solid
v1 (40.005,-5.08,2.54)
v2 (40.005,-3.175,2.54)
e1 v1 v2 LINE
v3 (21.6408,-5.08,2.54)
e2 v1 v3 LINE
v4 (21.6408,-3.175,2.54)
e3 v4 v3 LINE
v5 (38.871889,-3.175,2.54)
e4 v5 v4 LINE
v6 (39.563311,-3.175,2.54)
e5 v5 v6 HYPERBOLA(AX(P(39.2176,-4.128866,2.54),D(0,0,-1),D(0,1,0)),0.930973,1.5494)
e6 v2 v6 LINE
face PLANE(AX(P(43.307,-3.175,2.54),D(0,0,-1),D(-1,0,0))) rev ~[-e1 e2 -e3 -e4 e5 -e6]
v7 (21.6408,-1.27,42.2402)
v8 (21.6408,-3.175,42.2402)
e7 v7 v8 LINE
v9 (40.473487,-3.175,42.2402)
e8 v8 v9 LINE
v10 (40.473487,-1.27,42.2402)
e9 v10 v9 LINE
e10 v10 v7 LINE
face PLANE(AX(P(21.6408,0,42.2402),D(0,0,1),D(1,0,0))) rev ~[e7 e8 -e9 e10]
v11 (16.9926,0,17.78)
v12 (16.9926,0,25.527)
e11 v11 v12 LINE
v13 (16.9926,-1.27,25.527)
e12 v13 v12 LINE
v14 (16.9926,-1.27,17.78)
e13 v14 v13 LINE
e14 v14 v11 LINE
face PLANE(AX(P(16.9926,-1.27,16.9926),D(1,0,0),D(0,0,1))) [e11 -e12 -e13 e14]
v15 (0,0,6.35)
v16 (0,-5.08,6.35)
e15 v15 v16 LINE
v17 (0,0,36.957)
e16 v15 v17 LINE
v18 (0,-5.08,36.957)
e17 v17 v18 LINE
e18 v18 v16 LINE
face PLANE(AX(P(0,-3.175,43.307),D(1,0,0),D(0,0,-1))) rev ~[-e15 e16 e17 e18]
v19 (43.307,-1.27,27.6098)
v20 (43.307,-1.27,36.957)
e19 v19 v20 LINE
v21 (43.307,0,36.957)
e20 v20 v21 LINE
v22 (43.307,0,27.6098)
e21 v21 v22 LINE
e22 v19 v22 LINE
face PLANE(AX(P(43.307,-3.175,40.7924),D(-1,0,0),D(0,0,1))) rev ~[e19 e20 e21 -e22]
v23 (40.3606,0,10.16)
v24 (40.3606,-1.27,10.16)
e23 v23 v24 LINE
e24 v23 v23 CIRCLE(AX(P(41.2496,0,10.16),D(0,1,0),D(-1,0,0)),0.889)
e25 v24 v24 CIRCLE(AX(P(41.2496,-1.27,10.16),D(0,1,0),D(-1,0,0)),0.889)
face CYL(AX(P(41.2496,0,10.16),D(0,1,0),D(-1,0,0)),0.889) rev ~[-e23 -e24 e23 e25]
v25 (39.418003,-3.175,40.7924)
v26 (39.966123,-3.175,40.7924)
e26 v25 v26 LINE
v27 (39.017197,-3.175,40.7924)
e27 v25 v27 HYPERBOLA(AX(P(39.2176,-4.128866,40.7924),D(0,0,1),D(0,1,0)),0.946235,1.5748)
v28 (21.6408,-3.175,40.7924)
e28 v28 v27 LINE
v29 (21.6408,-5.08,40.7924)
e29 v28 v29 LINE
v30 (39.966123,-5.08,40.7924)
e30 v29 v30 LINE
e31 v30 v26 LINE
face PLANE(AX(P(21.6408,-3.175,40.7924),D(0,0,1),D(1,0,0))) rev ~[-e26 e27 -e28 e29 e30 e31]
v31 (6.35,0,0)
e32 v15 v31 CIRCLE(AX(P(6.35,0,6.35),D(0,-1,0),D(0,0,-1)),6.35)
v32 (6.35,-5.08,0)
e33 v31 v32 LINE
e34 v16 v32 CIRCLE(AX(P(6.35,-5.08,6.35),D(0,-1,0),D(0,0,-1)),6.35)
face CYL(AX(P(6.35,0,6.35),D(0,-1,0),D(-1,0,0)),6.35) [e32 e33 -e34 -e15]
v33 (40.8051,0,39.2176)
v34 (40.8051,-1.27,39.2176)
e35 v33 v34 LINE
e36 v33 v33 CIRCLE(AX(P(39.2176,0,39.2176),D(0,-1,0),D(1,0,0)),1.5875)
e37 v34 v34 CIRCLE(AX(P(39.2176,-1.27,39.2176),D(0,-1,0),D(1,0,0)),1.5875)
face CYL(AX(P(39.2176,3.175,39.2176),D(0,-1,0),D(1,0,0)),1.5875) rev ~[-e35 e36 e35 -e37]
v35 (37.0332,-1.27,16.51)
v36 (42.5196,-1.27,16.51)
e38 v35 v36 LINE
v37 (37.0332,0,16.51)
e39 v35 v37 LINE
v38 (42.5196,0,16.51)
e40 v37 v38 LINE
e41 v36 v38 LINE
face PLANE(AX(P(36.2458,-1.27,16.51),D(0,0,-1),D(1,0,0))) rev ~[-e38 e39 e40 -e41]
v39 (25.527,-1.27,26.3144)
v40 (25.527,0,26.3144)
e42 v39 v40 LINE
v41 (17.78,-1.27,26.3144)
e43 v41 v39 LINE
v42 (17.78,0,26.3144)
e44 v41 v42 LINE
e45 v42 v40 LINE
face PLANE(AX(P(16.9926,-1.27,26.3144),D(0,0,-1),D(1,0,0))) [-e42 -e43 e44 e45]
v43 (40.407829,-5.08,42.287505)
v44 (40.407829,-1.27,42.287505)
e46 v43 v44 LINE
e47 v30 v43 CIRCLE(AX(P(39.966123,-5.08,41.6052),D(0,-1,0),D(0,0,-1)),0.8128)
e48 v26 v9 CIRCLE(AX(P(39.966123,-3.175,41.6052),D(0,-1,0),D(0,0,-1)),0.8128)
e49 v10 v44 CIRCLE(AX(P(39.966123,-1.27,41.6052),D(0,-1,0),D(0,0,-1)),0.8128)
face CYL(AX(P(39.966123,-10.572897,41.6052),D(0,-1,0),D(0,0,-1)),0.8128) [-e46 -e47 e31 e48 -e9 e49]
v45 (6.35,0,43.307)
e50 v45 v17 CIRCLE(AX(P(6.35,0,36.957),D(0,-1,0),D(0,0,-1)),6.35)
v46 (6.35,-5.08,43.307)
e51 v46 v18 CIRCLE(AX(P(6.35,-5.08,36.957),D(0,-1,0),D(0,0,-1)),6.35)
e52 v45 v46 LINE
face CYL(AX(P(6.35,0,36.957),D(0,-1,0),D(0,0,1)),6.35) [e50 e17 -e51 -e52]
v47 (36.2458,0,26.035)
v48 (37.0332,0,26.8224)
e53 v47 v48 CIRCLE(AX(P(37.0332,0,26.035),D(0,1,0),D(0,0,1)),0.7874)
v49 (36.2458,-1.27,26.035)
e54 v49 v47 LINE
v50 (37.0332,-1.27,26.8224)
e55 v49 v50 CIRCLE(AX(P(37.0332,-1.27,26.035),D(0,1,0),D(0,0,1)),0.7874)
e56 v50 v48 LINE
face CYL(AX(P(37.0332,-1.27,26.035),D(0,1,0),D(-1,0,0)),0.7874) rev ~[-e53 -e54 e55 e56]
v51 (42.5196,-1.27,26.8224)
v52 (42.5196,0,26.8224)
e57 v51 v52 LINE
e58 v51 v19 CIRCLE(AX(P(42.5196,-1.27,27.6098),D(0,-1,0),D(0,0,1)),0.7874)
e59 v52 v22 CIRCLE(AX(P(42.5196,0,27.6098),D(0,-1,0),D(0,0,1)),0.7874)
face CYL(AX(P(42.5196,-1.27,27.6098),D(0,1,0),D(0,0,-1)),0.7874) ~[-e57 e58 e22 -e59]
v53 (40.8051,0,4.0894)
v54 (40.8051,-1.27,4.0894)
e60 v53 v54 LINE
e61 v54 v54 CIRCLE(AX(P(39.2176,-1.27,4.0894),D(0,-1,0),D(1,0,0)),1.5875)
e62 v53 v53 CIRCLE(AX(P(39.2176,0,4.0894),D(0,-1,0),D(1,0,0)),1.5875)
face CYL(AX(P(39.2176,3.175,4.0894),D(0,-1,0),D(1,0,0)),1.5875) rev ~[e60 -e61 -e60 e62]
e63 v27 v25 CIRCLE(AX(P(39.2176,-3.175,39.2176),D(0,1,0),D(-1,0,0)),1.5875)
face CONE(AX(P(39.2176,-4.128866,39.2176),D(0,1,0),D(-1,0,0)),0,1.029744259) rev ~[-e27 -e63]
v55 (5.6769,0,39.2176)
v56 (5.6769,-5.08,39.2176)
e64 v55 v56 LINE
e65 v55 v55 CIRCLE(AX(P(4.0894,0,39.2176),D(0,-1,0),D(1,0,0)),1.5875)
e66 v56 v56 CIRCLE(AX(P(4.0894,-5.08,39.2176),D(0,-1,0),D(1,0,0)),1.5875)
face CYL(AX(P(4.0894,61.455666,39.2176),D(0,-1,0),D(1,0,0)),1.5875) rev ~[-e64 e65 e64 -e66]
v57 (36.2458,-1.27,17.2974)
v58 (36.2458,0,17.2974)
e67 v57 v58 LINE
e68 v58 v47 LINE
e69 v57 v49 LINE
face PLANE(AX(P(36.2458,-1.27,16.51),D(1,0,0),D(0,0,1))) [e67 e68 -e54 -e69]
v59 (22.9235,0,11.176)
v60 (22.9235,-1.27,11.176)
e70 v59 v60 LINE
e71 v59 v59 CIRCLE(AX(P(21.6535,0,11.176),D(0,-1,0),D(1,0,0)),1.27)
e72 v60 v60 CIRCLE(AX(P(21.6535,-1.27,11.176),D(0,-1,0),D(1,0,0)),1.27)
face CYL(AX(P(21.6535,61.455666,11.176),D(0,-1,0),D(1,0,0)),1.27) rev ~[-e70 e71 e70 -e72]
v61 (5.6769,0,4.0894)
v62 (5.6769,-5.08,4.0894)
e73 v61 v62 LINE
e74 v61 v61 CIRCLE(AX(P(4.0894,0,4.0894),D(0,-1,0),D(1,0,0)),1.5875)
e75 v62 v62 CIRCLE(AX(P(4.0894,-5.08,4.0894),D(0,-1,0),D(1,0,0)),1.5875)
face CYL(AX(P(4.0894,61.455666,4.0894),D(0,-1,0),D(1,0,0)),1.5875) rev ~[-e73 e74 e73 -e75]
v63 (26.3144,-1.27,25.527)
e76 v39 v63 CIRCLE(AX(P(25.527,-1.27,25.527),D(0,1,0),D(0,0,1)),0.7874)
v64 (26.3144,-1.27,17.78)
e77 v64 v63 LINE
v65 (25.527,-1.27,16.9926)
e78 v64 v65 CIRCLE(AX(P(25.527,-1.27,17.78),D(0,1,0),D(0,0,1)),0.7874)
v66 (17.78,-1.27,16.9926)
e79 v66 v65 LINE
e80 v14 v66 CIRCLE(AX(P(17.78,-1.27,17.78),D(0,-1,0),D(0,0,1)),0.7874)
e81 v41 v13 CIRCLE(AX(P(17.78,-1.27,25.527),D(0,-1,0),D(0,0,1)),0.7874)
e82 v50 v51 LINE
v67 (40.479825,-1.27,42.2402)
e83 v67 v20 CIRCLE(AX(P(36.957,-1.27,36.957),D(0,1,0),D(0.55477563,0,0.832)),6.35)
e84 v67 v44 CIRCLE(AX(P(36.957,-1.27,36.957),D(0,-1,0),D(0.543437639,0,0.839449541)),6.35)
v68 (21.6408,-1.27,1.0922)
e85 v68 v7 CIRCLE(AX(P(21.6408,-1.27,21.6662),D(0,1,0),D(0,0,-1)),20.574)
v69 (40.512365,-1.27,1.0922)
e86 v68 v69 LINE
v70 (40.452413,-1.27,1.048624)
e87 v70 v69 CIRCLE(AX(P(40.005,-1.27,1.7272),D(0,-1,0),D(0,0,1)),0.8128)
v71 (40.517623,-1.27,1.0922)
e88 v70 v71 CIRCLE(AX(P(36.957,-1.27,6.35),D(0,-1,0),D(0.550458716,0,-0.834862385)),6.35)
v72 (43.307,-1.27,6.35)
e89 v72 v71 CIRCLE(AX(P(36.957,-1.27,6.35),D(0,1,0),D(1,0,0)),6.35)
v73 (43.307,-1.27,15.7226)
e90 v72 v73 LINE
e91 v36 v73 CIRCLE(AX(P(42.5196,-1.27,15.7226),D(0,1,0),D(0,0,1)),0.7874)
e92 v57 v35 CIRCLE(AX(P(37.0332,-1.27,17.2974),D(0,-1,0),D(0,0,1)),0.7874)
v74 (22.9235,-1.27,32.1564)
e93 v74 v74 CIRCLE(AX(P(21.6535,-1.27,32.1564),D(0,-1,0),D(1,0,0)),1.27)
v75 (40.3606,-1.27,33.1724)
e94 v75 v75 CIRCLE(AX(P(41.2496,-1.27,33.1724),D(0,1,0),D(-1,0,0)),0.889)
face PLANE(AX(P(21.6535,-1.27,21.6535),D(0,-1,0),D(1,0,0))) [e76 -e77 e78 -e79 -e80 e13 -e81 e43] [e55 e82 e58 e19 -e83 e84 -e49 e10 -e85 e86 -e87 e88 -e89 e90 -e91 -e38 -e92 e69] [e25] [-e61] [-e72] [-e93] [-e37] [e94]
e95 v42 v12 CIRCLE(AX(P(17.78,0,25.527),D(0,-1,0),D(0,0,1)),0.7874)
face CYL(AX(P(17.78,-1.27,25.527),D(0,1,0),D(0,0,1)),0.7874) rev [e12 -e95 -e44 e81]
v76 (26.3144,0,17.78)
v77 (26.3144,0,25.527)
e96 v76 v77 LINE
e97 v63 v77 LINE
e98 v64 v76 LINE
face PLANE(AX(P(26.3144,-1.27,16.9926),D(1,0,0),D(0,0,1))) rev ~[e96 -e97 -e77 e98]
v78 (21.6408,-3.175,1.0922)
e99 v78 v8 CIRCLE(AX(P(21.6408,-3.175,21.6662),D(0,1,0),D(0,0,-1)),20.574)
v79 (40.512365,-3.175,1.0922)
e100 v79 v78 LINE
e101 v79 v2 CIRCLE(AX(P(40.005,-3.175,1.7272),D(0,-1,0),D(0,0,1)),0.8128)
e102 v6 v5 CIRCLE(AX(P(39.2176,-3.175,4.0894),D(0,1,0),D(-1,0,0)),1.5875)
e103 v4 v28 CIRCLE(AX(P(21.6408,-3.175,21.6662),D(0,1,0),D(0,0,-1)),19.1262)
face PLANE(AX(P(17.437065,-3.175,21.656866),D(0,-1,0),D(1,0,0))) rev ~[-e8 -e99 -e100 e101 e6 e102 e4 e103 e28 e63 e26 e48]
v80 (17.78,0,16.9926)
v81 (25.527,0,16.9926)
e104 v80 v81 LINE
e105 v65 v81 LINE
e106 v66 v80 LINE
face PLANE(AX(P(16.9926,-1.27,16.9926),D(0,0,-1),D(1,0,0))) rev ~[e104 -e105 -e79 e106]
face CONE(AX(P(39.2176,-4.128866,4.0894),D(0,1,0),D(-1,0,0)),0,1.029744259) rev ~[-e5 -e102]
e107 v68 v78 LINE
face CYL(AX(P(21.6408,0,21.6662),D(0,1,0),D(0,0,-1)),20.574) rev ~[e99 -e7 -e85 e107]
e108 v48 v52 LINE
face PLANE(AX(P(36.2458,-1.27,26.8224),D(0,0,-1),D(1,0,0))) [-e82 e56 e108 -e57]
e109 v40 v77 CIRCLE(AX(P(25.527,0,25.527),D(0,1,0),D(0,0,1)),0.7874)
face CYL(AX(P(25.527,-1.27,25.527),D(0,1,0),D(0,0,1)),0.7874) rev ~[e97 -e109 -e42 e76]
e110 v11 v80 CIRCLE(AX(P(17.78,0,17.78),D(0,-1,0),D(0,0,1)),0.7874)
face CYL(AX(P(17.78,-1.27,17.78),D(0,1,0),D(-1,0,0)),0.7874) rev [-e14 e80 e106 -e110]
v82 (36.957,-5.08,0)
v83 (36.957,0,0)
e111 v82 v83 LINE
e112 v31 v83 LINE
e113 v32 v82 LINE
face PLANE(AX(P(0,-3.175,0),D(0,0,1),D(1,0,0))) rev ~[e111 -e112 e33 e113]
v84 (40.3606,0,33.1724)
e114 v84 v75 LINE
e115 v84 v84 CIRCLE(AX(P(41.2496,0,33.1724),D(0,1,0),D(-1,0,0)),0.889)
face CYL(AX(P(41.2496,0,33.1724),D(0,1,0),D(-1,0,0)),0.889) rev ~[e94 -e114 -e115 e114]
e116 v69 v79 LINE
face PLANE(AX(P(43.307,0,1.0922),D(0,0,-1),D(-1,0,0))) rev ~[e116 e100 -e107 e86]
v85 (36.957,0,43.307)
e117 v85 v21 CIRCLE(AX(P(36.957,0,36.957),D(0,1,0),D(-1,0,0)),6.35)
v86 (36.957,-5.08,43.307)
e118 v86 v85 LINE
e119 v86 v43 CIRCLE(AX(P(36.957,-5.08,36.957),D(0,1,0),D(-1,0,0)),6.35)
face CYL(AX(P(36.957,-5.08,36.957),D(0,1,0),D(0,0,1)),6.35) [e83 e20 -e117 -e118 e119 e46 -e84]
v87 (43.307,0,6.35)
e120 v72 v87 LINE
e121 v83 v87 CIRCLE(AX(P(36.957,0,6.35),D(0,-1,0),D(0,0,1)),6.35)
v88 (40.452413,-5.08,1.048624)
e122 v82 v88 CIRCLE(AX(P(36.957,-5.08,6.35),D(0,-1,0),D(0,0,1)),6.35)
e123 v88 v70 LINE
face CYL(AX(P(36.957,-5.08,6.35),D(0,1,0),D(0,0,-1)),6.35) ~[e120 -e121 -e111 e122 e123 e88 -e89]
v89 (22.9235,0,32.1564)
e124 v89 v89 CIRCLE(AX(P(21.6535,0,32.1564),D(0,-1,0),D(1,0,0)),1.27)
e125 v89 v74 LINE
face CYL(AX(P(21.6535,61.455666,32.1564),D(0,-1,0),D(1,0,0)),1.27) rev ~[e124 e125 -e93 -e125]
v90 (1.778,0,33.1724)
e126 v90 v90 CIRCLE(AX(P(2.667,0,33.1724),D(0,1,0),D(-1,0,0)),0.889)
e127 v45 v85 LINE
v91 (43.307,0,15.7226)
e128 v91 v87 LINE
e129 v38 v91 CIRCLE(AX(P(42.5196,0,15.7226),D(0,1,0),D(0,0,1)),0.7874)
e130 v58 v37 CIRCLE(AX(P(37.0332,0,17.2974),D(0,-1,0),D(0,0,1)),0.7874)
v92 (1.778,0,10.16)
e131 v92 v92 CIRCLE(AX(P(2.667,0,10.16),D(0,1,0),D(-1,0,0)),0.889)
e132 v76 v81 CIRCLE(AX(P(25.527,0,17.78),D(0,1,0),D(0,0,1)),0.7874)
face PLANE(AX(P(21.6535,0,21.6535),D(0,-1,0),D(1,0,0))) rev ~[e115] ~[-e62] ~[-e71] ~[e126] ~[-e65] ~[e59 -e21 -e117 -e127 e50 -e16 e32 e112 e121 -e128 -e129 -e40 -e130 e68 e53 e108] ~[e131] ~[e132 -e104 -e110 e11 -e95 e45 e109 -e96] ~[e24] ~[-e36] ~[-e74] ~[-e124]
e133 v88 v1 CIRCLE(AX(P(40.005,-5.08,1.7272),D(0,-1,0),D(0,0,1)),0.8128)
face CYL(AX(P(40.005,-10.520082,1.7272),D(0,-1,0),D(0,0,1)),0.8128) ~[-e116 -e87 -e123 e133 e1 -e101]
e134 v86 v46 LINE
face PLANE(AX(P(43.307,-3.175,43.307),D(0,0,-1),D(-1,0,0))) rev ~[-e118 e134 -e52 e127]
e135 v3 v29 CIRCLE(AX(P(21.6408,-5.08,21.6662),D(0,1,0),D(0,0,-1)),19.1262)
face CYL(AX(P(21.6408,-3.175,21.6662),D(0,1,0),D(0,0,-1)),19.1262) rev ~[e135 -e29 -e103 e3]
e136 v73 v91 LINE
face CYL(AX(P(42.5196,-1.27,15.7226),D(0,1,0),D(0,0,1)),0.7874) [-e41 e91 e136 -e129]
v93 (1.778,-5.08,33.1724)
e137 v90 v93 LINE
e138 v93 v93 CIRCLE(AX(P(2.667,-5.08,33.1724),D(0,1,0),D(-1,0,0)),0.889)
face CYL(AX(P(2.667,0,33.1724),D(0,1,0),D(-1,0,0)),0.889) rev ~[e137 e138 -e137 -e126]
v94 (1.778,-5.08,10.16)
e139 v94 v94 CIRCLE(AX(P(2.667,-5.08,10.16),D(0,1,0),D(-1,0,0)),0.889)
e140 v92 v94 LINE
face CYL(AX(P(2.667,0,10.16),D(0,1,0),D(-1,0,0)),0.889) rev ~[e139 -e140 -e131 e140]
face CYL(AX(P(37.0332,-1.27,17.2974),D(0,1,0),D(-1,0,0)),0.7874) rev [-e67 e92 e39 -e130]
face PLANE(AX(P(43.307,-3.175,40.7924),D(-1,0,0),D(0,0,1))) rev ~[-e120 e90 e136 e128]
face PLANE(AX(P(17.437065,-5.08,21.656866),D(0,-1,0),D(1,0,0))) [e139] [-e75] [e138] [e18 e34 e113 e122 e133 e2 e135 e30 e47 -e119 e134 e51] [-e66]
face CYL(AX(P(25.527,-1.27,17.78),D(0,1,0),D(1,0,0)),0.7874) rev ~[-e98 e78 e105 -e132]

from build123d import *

# Parameters (mm, degrees)
F0_W         = 43.307
F0_H         = 43.307
F1_DEPTH     = 1.27
F3_DEPTH     = 3.175
F5_DEPTH     = 1.905
F6_R         = 0.889
F7_DEPTH     = 5.081
F8_W         = 9.3218
F8_H         = 9.3218
F8_W_2       = 7.0612
F8_H_2       = 10.3124
F10_DEPTH    = 1.27
F11_D        = 3.175
F14_D        = 2.54
F15_R        = 6.35
F16_T4_DEPTH = 12.7851645967
F16_T9_DEPTH = 12.8907938144
F17_R        = 0.7874
F18_D        = 3.175
F18_DEPTH    = 3.175
F18_TIP      = 0.9538662327


# Not quite as in the source:
# - a fillet or chamfer that OpenCascade refuses, or shapes differently, is made with other operations: its cross-section is extruded or revolved along the edge and cut away or added


with BuildPart() as f1:
    # F0 (on Front) → F1 (new body)
    with BuildSketch(Plane.XZ):
        with Locations((21.6535, 21.6535)):
            Rectangle(F0_W, F0_H)
    extrude(amount=F1_DEPTH)

    # F2 (on Front) → F3 (join)
    with BuildSketch(Plane.XZ):
        with BuildLine():
            Line((43.307, 43.307), (0, 43.307))
            Line((0, 43.307), (0, 0))
            Line((0, 0), (43.307, 0))
            Line((43.307, 0), (43.307, 1.0922))
            Line((43.307, 1.0922), (21.6408, 1.0922))
            ThreePointArc((21.6408, 1.0922), (1.0668, 21.6662), (21.6408, 42.2402))
            Line((21.6408, 42.2402), (43.307, 42.2402))
            Line((43.307, 42.2402), (43.307, 43.307))
        make_face()
    extrude(amount=F3_DEPTH)

    # F4 (on face) → F5 (join)
    with BuildSketch(Plane.XZ.offset(3.175)):
        with BuildLine():
            Line((43.307, 43.307), (0, 43.307))
            Line((0, 43.307), (0, 0))
            Line((0, 0), (43.307, 0))
            Line((43.307, 0), (43.307, 2.54))
            Line((43.307, 2.54), (21.6408, 2.54))
            ThreePointArc((21.6408, 2.54), (2.5146, 21.6662), (21.6408, 40.7924))
            Line((21.6408, 40.7924), (43.307, 40.7924))
            Line((43.307, 40.7924), (43.307, 43.307))
        make_face()
    extrude(amount=F5_DEPTH)

    # F6 (on face) → F7 (cut, through all)
    with BuildSketch(Plane(origin=(0, 0, 0), x_dir=(-1, 0, 0), z_dir=(0, 1, 0))):
        with Locations((-41.2496, 33.1724)):
            Circle(F6_R)
        with Locations((-2.667, 33.1724)):
            Circle(F6_R)
        with Locations((-41.2496, 10.16)):
            Circle(F6_R)
        with Locations((-2.667, 10.16)):
            Circle(F6_R)
    extrude(amount=-F7_DEPTH, mode=Mode.SUBTRACT)

    # F8 (on face) → F10 (cut, through all)
    with BuildSketch(Plane.XZ.offset(1.27)):
        with Locations((21.6535, 21.6535)):
            Rectangle(F8_W, F8_H)
        with Locations((39.7764, 21.6662)):
            Rectangle(F8_W_2, F8_H_2)
    extrude(amount=-F10_DEPTH, mode=Mode.SUBTRACT)

    # F11 (through all)
    with Locations(Plane(origin=(0, 0, 0), x_dir=(-1, 0, 0), z_dir=(0, 1, 0))):
        with Locations((-4.0894, 39.2176), (-4.0894, 4.0894)):
            Hole(F11_D / 2)

    # F14 (through all)
    with Locations(Plane(origin=(0, 0, 0), x_dir=(-1, 0, 0), z_dir=(0, 1, 0))):
        with Locations((-21.6535, 32.1564), (-21.6535, 11.176)):
            Hole(F14_D / 2)

    # F15
    f15_edges = [f1.edges().sort_by_distance(p)[0] for p in [
        (0, -2.54, 43.307),
        (43.307, -2.54, 43.307),
        (43.307, -2.54, 0),
        (0, -2.54, 0),
    ]]
    fillet(f15_edges, radius=F15_R)

    # F16: fillet of radius 0.8128 on 2 edges, made by hand


with BuildPart() as f16_tool2:
    # F16_s3 → F16_t4 (new body)
    with BuildSketch(Plane.XZ.offset(10.5200822984)):
        with BuildLine():
            ThreePointArc((40.005, 2.54), (40.7835212046, 1.9607563614), (40.452412844, 1.0486238532))
            ThreePointArc((40.452412844, 1.0486238532), (41.3090658387, 1.7259300464), (42.037, 2.54))
            Line((42.037, 2.54), (40.005, 2.54))
        make_face()
    extrude(amount=-F16_T4_DEPTH)

    split(bisect_by=Plane.XZ.offset(1.27), keep=Keep.TOP)


with BuildPart() as f1_1:
    add(f1.part)

    # F16_t1: cut F16_tool2
    add(f16_tool2.part, mode=Mode.SUBTRACT)


with BuildPart() as f16_tool7:
    # F16_s8 → F16_t9 (new body)
    with BuildSketch(Plane.XZ.offset(10.5728969072)):
        with BuildLine():
            ThreePointArc((39.9661228955, 40.7924), (40.7456166441, 41.374910322), (40.4078290086, 42.2875045872))
            ThreePointArc((40.4078290086, 42.2875045872), (41.2779959557, 41.6101165847), (42.0178504068, 40.7924))
            Line((42.0178504068, 40.7924), (39.9661228955, 40.7924))
        make_face()
    extrude(amount=-F16_T9_DEPTH)

    split(bisect_by=Plane.XZ.offset(1.27), keep=Keep.TOP)


with BuildPart() as f1_2:
    add(f1_1.part)

    # F16_t6: cut F16_tool7
    add(f16_tool7.part, mode=Mode.SUBTRACT)

    # F17
    f17_edges = [f1_2.edges().sort_by_distance(p)[0] for p in [
        (43.307, -0.635, 26.8224),
        (36.2458, -0.635, 26.8224),
        (16.9926, -0.635, 26.3144),
        (16.9926, -0.635, 16.9926),
        (26.3144, -0.635, 16.9926),
        (43.307, -0.635, 16.51),
        (36.2458, -0.635, 16.51),
        (26.3144, -0.635, 26.3144),
    ]]
    fillet(f17_edges, radius=F17_R)

    # F18
    with Locations(Plane(origin=(0, 0, 0), x_dir=(-1, 0, 0), z_dir=(0, 1, 0))):
        with Locations((-39.2176, 4.0894), (-39.2176, 39.2176)):
            Hole(F18_D / 2, depth=F18_DEPTH)
            with Locations((0, 0, -(F18_DEPTH + F18_TIP / 2))):  # 118° drill point
                Cone(0, F18_D / 2, F18_TIP, mode=Mode.SUBTRACT)


solid = f1_2.part
